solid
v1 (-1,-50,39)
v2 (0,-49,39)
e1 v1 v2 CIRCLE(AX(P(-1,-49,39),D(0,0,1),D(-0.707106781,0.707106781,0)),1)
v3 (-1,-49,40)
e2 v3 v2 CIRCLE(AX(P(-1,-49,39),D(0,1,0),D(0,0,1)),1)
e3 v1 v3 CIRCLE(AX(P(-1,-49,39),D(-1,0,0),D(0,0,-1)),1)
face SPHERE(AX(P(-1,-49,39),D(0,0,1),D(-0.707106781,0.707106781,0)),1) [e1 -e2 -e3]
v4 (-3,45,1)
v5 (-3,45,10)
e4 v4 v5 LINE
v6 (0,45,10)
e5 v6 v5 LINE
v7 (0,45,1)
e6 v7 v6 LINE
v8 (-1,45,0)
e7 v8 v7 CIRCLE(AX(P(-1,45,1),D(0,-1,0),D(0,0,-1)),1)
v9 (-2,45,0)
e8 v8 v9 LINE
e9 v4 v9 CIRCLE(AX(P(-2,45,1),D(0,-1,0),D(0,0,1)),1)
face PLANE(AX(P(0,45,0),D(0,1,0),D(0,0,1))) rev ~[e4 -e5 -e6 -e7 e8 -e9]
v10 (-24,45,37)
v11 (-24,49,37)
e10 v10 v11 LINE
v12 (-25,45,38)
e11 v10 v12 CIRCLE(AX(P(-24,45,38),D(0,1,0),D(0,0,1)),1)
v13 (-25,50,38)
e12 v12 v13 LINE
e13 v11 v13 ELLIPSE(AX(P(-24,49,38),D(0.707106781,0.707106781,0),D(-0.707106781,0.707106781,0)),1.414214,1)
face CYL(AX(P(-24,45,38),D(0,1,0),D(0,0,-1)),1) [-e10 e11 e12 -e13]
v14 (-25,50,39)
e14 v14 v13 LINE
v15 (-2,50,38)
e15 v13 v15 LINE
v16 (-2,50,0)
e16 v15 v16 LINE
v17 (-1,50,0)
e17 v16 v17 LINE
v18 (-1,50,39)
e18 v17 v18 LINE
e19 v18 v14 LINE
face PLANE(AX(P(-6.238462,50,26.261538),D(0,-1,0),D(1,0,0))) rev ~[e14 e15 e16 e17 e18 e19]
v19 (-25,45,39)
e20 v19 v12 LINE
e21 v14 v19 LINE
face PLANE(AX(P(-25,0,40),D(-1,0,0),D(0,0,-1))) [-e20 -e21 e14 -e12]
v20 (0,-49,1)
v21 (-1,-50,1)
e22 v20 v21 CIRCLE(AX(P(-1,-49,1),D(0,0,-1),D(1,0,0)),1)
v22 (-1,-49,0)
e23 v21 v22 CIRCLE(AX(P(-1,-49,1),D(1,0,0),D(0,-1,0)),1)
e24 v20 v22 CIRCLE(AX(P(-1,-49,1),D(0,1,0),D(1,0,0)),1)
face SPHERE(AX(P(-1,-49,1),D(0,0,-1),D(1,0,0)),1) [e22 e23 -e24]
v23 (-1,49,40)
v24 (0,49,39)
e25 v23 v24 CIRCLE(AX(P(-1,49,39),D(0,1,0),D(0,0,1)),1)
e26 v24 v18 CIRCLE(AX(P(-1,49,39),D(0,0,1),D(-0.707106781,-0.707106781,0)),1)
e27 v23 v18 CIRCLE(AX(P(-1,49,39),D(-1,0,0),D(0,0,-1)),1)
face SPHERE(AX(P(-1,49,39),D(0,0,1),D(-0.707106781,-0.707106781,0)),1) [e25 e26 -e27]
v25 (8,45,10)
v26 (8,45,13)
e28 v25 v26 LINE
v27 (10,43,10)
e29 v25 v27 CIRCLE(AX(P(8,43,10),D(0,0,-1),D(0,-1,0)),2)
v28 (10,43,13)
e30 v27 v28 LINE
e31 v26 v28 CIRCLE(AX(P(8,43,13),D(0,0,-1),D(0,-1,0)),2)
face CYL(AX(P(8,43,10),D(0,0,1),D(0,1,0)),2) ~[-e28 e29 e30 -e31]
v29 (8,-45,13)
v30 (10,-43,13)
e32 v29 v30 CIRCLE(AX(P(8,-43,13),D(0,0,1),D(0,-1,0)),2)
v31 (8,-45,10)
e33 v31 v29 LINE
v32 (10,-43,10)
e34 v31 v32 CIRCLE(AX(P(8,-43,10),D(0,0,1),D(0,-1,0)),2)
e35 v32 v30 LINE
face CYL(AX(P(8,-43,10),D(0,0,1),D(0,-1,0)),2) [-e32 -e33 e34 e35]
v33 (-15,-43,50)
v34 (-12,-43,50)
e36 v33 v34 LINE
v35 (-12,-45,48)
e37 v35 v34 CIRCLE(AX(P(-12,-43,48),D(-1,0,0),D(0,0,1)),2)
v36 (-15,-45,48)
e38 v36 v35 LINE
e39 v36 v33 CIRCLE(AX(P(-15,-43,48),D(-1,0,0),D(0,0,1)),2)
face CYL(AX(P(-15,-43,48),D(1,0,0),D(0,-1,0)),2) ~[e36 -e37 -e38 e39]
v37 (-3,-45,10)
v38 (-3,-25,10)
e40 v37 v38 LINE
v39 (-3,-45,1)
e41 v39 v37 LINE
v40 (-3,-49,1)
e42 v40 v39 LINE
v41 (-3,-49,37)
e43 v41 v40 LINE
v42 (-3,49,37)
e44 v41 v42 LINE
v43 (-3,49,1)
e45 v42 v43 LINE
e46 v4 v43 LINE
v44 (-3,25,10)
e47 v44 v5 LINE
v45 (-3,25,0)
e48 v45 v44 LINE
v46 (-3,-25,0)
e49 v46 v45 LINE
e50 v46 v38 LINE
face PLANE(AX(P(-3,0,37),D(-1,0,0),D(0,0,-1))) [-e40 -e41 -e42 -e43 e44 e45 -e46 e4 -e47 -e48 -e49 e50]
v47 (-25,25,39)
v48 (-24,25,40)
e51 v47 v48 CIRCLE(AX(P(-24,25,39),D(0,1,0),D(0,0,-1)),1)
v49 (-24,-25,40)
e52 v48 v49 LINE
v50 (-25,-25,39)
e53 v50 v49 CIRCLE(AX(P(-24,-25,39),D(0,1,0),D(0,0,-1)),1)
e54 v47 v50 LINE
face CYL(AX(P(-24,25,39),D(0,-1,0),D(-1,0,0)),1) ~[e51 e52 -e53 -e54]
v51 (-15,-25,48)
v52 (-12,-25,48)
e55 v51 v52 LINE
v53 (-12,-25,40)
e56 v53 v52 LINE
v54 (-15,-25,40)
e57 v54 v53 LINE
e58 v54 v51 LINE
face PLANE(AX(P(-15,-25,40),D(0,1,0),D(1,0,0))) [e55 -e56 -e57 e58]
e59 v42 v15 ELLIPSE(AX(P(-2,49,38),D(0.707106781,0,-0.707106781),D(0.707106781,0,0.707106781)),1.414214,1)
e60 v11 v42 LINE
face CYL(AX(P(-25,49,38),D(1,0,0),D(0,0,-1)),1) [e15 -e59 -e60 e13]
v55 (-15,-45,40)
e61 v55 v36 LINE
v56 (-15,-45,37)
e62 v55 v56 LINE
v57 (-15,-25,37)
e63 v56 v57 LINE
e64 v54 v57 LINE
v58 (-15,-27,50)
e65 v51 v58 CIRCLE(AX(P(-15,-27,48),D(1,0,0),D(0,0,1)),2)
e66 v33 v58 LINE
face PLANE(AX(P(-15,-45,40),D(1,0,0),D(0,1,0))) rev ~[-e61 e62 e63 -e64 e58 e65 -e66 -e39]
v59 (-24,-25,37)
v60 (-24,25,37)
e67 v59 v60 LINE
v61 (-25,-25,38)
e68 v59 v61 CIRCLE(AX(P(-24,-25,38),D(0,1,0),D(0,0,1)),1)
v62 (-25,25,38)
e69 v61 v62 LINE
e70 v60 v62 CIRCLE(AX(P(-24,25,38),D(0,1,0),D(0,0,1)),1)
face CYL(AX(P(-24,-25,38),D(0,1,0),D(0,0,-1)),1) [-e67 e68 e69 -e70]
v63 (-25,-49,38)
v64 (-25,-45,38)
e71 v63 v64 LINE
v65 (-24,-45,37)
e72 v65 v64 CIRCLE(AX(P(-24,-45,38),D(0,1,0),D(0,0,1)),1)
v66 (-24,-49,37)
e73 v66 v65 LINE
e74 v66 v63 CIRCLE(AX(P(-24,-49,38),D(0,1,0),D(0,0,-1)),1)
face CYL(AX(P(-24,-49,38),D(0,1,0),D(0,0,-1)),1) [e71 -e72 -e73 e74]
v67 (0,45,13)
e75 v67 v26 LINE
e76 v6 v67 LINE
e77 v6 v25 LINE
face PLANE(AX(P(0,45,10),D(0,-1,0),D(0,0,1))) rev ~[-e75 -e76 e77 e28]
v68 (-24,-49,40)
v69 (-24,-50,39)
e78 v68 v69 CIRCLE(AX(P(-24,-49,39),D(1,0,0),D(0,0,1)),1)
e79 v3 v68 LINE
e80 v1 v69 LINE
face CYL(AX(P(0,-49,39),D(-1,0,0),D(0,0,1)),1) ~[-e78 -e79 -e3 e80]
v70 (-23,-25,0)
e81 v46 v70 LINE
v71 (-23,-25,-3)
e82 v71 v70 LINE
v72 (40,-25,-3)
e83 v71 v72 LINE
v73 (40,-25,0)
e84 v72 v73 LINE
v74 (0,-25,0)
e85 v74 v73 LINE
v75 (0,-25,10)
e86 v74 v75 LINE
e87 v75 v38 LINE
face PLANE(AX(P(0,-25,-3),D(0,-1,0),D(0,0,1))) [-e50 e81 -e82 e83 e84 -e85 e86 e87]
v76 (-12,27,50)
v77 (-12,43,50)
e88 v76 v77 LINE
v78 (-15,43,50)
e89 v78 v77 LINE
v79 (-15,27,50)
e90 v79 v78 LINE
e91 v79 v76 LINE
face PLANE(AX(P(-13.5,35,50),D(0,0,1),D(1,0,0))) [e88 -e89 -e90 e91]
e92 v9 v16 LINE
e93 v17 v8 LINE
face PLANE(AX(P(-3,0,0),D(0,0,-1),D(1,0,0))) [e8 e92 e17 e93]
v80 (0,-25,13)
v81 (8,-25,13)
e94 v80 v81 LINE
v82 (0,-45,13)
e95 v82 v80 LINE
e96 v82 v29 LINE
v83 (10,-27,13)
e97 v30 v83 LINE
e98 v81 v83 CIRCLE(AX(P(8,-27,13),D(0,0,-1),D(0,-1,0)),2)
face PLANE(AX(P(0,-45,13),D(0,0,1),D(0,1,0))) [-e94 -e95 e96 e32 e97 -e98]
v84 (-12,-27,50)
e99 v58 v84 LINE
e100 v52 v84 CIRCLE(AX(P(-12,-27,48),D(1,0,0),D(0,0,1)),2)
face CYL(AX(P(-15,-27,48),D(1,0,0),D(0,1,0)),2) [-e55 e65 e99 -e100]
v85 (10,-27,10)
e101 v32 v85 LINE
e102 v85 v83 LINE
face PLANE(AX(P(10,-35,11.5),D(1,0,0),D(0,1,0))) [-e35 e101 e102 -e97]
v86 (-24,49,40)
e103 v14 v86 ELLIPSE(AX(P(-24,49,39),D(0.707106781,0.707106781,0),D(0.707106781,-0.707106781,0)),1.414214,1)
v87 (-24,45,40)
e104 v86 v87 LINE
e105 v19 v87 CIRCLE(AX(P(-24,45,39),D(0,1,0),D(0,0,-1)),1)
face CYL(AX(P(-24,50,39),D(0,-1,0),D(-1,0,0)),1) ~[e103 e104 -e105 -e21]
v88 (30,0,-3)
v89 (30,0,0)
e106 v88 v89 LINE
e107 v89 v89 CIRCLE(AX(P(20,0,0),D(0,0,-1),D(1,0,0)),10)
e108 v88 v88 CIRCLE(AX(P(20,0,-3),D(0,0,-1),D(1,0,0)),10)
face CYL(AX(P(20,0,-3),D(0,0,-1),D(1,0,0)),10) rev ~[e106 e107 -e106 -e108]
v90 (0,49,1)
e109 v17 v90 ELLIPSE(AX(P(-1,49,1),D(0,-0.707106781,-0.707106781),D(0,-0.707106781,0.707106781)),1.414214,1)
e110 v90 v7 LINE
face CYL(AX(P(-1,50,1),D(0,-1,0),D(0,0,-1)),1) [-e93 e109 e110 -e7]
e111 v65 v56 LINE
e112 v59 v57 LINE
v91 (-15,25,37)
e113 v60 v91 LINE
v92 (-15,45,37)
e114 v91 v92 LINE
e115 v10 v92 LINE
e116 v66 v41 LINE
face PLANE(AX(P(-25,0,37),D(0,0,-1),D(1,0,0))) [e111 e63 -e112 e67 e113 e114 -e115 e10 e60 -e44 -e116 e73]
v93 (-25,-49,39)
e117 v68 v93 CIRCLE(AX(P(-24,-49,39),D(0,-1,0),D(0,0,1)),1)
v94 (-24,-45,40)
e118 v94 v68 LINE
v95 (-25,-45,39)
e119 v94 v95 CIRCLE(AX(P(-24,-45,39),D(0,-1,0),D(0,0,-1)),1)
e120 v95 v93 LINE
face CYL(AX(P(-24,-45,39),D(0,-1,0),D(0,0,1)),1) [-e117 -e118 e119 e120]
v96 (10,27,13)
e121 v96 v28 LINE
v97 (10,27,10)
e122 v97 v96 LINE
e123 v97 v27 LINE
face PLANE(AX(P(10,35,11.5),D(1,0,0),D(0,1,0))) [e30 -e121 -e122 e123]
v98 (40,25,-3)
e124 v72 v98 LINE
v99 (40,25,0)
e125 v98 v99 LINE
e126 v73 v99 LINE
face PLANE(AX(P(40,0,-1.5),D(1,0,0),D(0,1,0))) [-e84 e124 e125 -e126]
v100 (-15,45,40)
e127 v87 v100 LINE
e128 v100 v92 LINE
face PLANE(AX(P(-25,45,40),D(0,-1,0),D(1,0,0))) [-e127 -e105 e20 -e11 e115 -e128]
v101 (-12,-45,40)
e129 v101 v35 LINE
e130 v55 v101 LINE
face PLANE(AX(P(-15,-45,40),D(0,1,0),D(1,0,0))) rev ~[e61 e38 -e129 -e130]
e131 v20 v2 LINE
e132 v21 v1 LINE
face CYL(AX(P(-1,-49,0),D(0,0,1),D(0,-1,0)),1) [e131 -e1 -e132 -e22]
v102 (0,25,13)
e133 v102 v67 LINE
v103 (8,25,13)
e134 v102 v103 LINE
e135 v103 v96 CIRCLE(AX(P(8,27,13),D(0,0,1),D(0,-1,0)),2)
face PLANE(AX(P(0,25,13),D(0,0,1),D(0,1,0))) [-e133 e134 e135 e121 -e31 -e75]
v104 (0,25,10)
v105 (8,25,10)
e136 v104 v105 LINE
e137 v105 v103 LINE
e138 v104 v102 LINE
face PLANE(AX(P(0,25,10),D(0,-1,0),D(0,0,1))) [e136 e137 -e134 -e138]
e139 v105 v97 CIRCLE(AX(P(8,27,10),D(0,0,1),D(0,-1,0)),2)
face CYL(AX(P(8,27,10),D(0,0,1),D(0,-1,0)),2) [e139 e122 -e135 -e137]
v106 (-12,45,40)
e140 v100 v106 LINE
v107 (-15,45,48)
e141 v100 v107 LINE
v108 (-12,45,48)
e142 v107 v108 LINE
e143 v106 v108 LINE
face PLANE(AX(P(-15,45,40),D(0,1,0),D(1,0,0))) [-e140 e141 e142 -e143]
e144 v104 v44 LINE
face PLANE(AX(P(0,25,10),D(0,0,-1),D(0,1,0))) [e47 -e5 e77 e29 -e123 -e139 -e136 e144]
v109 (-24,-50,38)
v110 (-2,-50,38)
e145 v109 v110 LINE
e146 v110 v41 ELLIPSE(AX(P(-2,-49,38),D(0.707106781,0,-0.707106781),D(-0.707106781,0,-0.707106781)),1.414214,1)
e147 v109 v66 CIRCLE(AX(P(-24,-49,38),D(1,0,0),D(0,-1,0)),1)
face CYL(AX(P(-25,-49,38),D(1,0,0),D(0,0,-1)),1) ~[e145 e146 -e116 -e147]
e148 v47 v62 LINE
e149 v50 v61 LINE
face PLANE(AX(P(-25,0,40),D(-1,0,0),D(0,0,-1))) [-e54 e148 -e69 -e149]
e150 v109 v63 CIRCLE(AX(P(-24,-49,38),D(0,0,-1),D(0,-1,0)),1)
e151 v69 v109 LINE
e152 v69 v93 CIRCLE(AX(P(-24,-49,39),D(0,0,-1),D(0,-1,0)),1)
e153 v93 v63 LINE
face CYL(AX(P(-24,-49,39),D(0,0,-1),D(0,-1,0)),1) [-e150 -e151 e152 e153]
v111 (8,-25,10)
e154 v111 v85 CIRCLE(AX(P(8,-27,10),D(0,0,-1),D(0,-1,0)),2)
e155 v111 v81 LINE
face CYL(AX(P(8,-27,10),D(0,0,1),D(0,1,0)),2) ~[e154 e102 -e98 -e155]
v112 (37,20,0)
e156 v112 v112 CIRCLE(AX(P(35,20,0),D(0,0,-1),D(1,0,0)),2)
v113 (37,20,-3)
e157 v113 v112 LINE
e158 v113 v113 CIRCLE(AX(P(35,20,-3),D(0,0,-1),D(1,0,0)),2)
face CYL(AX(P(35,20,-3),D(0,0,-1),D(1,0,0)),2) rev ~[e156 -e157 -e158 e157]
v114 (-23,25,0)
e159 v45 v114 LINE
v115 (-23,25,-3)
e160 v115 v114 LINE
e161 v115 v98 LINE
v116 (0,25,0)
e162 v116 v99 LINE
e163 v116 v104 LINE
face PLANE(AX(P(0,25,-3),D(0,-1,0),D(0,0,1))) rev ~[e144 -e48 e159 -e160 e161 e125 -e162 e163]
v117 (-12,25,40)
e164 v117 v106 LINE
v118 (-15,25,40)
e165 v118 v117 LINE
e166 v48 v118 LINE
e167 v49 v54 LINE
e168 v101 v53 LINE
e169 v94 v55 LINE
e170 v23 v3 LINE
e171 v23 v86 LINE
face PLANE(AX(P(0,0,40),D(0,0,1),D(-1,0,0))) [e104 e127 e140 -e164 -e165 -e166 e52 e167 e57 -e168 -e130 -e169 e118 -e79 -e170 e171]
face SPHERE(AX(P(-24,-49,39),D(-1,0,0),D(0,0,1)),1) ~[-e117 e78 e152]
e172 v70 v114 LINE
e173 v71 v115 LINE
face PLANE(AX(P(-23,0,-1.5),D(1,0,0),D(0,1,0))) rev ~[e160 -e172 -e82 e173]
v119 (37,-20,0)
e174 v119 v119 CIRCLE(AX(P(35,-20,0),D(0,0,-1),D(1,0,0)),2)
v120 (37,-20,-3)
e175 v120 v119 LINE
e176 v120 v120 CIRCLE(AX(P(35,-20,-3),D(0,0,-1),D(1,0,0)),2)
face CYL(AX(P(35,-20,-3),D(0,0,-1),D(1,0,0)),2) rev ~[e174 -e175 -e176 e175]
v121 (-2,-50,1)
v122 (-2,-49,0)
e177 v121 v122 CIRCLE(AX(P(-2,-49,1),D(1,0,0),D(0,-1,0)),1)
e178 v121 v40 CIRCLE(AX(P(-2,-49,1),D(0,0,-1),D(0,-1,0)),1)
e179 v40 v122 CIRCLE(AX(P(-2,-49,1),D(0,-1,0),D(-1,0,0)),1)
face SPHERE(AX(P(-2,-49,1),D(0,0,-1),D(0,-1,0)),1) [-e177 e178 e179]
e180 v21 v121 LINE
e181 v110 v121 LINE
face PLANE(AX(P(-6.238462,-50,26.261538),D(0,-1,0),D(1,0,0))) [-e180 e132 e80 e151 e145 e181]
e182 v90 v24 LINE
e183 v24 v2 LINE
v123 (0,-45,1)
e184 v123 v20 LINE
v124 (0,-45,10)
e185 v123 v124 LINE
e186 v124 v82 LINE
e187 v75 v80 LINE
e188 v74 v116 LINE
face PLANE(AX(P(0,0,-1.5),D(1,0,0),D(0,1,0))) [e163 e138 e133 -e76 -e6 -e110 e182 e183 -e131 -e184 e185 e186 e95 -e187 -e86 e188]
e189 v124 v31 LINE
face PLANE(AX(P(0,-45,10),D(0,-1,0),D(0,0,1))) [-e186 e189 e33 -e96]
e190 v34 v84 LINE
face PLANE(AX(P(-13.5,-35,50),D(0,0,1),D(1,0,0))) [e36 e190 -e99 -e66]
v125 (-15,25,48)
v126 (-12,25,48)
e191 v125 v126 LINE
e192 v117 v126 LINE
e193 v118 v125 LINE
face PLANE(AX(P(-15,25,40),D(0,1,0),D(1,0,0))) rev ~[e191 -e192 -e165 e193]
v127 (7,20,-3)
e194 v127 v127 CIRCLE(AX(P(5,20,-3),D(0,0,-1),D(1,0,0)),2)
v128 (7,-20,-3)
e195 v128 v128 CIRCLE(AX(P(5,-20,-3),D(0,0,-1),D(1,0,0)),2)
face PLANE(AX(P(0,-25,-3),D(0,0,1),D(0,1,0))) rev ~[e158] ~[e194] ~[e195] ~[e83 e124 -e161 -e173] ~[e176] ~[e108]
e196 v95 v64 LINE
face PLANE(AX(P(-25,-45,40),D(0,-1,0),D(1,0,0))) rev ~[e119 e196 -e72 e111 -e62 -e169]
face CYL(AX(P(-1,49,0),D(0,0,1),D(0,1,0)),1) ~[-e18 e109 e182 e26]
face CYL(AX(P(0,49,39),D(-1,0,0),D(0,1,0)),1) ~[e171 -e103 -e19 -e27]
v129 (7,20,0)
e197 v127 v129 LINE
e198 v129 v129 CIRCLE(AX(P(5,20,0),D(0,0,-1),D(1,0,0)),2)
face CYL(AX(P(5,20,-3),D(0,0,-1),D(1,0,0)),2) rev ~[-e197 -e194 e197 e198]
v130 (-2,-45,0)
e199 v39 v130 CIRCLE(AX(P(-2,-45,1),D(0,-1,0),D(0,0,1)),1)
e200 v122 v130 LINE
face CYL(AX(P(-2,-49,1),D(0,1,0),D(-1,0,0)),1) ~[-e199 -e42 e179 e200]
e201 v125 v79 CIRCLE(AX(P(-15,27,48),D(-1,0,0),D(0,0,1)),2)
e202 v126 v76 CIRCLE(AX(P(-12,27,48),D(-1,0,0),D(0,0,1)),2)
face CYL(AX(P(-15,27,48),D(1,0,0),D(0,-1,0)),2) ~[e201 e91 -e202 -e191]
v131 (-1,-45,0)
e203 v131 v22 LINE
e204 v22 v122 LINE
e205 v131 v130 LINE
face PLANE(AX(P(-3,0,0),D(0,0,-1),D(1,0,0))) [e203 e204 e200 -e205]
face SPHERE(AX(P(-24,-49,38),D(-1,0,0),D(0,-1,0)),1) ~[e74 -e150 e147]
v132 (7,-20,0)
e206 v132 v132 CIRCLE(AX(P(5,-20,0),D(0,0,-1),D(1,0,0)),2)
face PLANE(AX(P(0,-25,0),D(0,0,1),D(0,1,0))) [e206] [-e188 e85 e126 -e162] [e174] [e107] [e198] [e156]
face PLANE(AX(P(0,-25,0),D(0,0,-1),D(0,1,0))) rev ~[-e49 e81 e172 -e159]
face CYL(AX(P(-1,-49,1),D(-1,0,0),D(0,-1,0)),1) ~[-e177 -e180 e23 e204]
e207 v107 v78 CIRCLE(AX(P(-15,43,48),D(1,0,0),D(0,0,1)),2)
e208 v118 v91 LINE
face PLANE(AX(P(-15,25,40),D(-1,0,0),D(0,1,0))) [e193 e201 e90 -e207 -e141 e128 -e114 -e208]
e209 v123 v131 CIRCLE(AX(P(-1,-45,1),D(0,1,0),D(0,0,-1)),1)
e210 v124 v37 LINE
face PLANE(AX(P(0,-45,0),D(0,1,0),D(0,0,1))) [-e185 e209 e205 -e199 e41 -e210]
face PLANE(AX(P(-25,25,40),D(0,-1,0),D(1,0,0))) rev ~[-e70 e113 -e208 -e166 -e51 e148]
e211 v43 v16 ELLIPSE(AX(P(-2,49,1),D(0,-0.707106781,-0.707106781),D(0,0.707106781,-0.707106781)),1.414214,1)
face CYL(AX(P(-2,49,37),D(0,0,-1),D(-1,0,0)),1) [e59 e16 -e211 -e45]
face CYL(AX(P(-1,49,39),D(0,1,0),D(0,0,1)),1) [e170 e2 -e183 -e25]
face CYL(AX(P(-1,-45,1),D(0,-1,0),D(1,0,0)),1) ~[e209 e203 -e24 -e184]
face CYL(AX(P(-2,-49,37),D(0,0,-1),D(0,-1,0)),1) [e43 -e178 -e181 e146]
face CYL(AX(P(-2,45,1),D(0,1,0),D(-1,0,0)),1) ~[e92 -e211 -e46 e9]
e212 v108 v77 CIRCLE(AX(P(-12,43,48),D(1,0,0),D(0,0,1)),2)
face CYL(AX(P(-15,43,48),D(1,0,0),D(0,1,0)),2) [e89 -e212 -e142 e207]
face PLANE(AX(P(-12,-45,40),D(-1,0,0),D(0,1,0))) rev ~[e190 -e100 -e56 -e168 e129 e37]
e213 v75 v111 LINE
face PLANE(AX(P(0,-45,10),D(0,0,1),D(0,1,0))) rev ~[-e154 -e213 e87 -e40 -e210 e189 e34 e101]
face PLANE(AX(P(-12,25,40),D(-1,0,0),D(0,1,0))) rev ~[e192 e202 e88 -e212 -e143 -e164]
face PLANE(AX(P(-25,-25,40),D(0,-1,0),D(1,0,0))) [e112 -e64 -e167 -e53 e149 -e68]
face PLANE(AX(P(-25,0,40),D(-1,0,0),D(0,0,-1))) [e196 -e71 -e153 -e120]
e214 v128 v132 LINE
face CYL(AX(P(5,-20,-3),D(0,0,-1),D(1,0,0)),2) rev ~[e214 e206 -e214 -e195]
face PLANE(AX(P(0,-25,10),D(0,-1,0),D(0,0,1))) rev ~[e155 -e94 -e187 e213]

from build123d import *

# Parameters (mm, degrees)
F1_DEPTH      = 50
F2_W          = 20
F2_H          = 10
F3_DEPTH      = 3
F2_H_2        = 3
F4_DEPTH      = 10
F5_W          = 10
F5_H          = 20
F6_DEPTH      = 3
F5_W_2        = 3
F7_DEPTH      = 10
F8_R          = 2
F9_R          = 1
F10_R         = 1
F11_R         = 1
F12_T1_DEPTH  = 98
F12_S5_W      = 1
F12_S5_H      = 1
F12_T6_DEPTH  = 1
F12_S11_W     = 1
F12_S11_H     = 1
F12_T12_DEPTH = 1
F13_W         = 50
F13_H         = 3
F14_DEPTH     = 23
F15_W         = 50
F15_H         = 3
F16_DEPTH     = 40
F17_R         = 2
F17_R_2       = 10
F18_DEPTH     = 25


# Not quite as in the source:
# - a fillet or chamfer that OpenCascade refuses, or shapes differently, is made with other operations: its cross-section is extruded or revolved along the edge and cut away or added


with BuildPart() as f1:
    # F0 (on Front) → F1 (new body, symmetric)
    with BuildSketch(Plane.XZ):
        Polygon((-3, 0), (0, 0), (0, 40), (-25, 40), (-25, 37), (-3, 37), align=None)
    extrude(amount=F1_DEPTH, both=True)

    # F2 (on face) → F3 (cut, through all)
    with BuildSketch(Plane.YZ):
        with Locations((-35, 5)):
            Rectangle(F2_W, F2_H)
        with Locations((35, 5)):
            Rectangle(F2_W, F2_H)
    extrude(amount=-F3_DEPTH, mode=Mode.SUBTRACT)

    # F2 (on face) → F4 (join)
    with BuildSketch(Plane.YZ):
        with Locations((-35, 11.5)):
            Rectangle(F2_W, F2_H_2)
        with Locations((35, 11.5)):
            Rectangle(F2_W, F2_H_2)
    extrude(amount=F4_DEPTH)

    # F5 (on face) → F6 (cut, through all)
    with BuildSketch(Plane.XY.offset(40)):
        with Locations((-20, 35)):
            Rectangle(F5_W, F5_H)
        with Locations((-20, -35)):
            Rectangle(F5_W, F5_H)
    extrude(amount=-F6_DEPTH, mode=Mode.SUBTRACT)

    # F5 (on face) → F7 (join)
    with BuildSketch(Plane.XY.offset(40)):
        with Locations((-13.5, 35)):
            Rectangle(F5_W_2, F5_H)
        with Locations((-13.5, -35)):
            Rectangle(F5_W_2, F5_H)
    extrude(amount=F7_DEPTH)

    # F8
    f8_edges = [f1.edges().sort_by_distance(p)[0] for p in [
        (-13.5, 25, 50),
        (-13.5, 45, 50),
        (-13.5, -25, 50),
        (-13.5, -45, 50),
        (10, -45, 11.5),
        (10, -25, 11.5),
        (10, 25, 11.5),
        (10, 45, 11.5),
    ]]
    fillet(f8_edges, radius=F8_R)

    # F9
    f9_edges = [f1.edges().sort_by_distance(p)[0] for p in [
        (-12.5, -50, 40),
        (0, -50, 20),
        (-3, -50, 18.5),
        (-14, -50, 37),
    ]]
    fillet(f9_edges, radius=F9_R)

    # F10
    f10_edges = [f1.edges().sort_by_distance(p)[0] for p in [
        (-25, -47, 37),
        (-25, -47, 40),
    ]]
    fillet(f10_edges, radius=F10_R)

    # F11
    f11_edges = [f1.edges().sort_by_distance(p)[0] for p in [
        (-25, 0, 40),
        (-25, 0, 37),
        (-25, 47.5, 40),
        (-25, 47.5, 37),
        (-14, 50, 37),
        (-12.5, 50, 40),
        (-3, 50, 18.5),
        (0, 50, 20),
        (-3, 47.5, 0),
        (0, 47.5, 0),
        (-3, -47, 0),
        (0, -47, 0),
    ]]
    fillet(f11_edges, radius=F11_R)

    # F12: fillet of radius 1 on 1 edges, made by hand

    # F12_s2 → F12_t1 (cut)
    with BuildSketch(Plane.XZ.offset(-49)):
        with BuildLine():
            ThreePointArc((-1, 40), (-0.2928932188, 39.7071067812), (0, 39))
            Line((0, 39), (0, 40))
            Line((0, 40), (-1, 40))
        make_face()
    extrude(amount=F12_T1_DEPTH, mode=Mode.SUBTRACT)


with BuildPart() as f12_tool4:
    # F12_s5 → F12_t6 (new body)
    with BuildSketch(Plane.XY.offset(39)):
        with Locations((-0.5, 49.5)):
            Rectangle(F12_S5_W, F12_S5_H)
    extrude(amount=F12_T6_DEPTH)

    # F12_s7 → F12_t8 (revolve, cut)
    with BuildSketch(Plane(origin=(-1, 49, 39), x_dir=(-0.7071067812, -0.7071067812, 0), z_dir=(-0.7071067812, 0.7071067812, 0))):
        with BuildLine():
            ThreePointArc((0, -1), (1, 0), (0, 1))
            Line((0, 1), (0, -1))
        make_face()
    revolve(axis=Axis((-1, 49, 39), (0, 0, 1)), mode=Mode.SUBTRACT)


with BuildPart() as f1_1:
    add(f1.part)

    # F12_t3: cut F12_tool4
    add(f12_tool4.part, mode=Mode.SUBTRACT)


with BuildPart() as f12_tool10:
    # F12_s11 → F12_t12 (new body)
    with BuildSketch(Plane.XY.offset(39)):
        with Locations((-0.5, -49.5)):
            Rectangle(F12_S11_W, F12_S11_H)
    extrude(amount=F12_T12_DEPTH)

    # F12_s13 → F12_t14 (revolve, cut)
    with BuildSketch(Plane(origin=(-1, -49, 39), x_dir=(-0.7071067812, 0.7071067812, 0), z_dir=(0.7071067812, 0.7071067812, 0))):
        with BuildLine():
            ThreePointArc((0, -1), (1, 0), (0, 1))
            Line((0, 1), (0, -1))
        make_face()
    revolve(axis=Axis((-1, -49, 39), (0, 0, 1)), mode=Mode.SUBTRACT)


with BuildPart() as f1_2:
    add(f1_1.part)

    # F12_t9: cut F12_tool10
    add(f12_tool10.part, mode=Mode.SUBTRACT)

    # F13 (on Right) → F14 (join)
    with BuildSketch(Plane.YZ):
        with Locations((0, -1.5)):
            Rectangle(F13_W, F13_H)
    extrude(amount=-F14_DEPTH)

    # F15 (on face) → F16 (join)
    with BuildSketch(Plane.YZ):
        with Locations((0, -1.5)):
            Rectangle(F15_W, F15_H)
    extrude(amount=F16_DEPTH)

    # F17 (on face) → F18 (cut)
    with BuildSketch(Plane(origin=(0, 0, -3), x_dir=(1, 0, 0), z_dir=(0, 0, -1))):
        with Locations((35, 20)):
            Circle(F17_R)
        with Locations((5, 20)):
            Circle(F17_R)
        with Locations((20, 0)):
            Circle(F17_R_2)
        with Locations((35, -20)):
            Circle(F17_R)
        with Locations((5, -20)):
            Circle(F17_R)
    extrude(amount=-F18_DEPTH, mode=Mode.SUBTRACT)


solid = f1_2.part
